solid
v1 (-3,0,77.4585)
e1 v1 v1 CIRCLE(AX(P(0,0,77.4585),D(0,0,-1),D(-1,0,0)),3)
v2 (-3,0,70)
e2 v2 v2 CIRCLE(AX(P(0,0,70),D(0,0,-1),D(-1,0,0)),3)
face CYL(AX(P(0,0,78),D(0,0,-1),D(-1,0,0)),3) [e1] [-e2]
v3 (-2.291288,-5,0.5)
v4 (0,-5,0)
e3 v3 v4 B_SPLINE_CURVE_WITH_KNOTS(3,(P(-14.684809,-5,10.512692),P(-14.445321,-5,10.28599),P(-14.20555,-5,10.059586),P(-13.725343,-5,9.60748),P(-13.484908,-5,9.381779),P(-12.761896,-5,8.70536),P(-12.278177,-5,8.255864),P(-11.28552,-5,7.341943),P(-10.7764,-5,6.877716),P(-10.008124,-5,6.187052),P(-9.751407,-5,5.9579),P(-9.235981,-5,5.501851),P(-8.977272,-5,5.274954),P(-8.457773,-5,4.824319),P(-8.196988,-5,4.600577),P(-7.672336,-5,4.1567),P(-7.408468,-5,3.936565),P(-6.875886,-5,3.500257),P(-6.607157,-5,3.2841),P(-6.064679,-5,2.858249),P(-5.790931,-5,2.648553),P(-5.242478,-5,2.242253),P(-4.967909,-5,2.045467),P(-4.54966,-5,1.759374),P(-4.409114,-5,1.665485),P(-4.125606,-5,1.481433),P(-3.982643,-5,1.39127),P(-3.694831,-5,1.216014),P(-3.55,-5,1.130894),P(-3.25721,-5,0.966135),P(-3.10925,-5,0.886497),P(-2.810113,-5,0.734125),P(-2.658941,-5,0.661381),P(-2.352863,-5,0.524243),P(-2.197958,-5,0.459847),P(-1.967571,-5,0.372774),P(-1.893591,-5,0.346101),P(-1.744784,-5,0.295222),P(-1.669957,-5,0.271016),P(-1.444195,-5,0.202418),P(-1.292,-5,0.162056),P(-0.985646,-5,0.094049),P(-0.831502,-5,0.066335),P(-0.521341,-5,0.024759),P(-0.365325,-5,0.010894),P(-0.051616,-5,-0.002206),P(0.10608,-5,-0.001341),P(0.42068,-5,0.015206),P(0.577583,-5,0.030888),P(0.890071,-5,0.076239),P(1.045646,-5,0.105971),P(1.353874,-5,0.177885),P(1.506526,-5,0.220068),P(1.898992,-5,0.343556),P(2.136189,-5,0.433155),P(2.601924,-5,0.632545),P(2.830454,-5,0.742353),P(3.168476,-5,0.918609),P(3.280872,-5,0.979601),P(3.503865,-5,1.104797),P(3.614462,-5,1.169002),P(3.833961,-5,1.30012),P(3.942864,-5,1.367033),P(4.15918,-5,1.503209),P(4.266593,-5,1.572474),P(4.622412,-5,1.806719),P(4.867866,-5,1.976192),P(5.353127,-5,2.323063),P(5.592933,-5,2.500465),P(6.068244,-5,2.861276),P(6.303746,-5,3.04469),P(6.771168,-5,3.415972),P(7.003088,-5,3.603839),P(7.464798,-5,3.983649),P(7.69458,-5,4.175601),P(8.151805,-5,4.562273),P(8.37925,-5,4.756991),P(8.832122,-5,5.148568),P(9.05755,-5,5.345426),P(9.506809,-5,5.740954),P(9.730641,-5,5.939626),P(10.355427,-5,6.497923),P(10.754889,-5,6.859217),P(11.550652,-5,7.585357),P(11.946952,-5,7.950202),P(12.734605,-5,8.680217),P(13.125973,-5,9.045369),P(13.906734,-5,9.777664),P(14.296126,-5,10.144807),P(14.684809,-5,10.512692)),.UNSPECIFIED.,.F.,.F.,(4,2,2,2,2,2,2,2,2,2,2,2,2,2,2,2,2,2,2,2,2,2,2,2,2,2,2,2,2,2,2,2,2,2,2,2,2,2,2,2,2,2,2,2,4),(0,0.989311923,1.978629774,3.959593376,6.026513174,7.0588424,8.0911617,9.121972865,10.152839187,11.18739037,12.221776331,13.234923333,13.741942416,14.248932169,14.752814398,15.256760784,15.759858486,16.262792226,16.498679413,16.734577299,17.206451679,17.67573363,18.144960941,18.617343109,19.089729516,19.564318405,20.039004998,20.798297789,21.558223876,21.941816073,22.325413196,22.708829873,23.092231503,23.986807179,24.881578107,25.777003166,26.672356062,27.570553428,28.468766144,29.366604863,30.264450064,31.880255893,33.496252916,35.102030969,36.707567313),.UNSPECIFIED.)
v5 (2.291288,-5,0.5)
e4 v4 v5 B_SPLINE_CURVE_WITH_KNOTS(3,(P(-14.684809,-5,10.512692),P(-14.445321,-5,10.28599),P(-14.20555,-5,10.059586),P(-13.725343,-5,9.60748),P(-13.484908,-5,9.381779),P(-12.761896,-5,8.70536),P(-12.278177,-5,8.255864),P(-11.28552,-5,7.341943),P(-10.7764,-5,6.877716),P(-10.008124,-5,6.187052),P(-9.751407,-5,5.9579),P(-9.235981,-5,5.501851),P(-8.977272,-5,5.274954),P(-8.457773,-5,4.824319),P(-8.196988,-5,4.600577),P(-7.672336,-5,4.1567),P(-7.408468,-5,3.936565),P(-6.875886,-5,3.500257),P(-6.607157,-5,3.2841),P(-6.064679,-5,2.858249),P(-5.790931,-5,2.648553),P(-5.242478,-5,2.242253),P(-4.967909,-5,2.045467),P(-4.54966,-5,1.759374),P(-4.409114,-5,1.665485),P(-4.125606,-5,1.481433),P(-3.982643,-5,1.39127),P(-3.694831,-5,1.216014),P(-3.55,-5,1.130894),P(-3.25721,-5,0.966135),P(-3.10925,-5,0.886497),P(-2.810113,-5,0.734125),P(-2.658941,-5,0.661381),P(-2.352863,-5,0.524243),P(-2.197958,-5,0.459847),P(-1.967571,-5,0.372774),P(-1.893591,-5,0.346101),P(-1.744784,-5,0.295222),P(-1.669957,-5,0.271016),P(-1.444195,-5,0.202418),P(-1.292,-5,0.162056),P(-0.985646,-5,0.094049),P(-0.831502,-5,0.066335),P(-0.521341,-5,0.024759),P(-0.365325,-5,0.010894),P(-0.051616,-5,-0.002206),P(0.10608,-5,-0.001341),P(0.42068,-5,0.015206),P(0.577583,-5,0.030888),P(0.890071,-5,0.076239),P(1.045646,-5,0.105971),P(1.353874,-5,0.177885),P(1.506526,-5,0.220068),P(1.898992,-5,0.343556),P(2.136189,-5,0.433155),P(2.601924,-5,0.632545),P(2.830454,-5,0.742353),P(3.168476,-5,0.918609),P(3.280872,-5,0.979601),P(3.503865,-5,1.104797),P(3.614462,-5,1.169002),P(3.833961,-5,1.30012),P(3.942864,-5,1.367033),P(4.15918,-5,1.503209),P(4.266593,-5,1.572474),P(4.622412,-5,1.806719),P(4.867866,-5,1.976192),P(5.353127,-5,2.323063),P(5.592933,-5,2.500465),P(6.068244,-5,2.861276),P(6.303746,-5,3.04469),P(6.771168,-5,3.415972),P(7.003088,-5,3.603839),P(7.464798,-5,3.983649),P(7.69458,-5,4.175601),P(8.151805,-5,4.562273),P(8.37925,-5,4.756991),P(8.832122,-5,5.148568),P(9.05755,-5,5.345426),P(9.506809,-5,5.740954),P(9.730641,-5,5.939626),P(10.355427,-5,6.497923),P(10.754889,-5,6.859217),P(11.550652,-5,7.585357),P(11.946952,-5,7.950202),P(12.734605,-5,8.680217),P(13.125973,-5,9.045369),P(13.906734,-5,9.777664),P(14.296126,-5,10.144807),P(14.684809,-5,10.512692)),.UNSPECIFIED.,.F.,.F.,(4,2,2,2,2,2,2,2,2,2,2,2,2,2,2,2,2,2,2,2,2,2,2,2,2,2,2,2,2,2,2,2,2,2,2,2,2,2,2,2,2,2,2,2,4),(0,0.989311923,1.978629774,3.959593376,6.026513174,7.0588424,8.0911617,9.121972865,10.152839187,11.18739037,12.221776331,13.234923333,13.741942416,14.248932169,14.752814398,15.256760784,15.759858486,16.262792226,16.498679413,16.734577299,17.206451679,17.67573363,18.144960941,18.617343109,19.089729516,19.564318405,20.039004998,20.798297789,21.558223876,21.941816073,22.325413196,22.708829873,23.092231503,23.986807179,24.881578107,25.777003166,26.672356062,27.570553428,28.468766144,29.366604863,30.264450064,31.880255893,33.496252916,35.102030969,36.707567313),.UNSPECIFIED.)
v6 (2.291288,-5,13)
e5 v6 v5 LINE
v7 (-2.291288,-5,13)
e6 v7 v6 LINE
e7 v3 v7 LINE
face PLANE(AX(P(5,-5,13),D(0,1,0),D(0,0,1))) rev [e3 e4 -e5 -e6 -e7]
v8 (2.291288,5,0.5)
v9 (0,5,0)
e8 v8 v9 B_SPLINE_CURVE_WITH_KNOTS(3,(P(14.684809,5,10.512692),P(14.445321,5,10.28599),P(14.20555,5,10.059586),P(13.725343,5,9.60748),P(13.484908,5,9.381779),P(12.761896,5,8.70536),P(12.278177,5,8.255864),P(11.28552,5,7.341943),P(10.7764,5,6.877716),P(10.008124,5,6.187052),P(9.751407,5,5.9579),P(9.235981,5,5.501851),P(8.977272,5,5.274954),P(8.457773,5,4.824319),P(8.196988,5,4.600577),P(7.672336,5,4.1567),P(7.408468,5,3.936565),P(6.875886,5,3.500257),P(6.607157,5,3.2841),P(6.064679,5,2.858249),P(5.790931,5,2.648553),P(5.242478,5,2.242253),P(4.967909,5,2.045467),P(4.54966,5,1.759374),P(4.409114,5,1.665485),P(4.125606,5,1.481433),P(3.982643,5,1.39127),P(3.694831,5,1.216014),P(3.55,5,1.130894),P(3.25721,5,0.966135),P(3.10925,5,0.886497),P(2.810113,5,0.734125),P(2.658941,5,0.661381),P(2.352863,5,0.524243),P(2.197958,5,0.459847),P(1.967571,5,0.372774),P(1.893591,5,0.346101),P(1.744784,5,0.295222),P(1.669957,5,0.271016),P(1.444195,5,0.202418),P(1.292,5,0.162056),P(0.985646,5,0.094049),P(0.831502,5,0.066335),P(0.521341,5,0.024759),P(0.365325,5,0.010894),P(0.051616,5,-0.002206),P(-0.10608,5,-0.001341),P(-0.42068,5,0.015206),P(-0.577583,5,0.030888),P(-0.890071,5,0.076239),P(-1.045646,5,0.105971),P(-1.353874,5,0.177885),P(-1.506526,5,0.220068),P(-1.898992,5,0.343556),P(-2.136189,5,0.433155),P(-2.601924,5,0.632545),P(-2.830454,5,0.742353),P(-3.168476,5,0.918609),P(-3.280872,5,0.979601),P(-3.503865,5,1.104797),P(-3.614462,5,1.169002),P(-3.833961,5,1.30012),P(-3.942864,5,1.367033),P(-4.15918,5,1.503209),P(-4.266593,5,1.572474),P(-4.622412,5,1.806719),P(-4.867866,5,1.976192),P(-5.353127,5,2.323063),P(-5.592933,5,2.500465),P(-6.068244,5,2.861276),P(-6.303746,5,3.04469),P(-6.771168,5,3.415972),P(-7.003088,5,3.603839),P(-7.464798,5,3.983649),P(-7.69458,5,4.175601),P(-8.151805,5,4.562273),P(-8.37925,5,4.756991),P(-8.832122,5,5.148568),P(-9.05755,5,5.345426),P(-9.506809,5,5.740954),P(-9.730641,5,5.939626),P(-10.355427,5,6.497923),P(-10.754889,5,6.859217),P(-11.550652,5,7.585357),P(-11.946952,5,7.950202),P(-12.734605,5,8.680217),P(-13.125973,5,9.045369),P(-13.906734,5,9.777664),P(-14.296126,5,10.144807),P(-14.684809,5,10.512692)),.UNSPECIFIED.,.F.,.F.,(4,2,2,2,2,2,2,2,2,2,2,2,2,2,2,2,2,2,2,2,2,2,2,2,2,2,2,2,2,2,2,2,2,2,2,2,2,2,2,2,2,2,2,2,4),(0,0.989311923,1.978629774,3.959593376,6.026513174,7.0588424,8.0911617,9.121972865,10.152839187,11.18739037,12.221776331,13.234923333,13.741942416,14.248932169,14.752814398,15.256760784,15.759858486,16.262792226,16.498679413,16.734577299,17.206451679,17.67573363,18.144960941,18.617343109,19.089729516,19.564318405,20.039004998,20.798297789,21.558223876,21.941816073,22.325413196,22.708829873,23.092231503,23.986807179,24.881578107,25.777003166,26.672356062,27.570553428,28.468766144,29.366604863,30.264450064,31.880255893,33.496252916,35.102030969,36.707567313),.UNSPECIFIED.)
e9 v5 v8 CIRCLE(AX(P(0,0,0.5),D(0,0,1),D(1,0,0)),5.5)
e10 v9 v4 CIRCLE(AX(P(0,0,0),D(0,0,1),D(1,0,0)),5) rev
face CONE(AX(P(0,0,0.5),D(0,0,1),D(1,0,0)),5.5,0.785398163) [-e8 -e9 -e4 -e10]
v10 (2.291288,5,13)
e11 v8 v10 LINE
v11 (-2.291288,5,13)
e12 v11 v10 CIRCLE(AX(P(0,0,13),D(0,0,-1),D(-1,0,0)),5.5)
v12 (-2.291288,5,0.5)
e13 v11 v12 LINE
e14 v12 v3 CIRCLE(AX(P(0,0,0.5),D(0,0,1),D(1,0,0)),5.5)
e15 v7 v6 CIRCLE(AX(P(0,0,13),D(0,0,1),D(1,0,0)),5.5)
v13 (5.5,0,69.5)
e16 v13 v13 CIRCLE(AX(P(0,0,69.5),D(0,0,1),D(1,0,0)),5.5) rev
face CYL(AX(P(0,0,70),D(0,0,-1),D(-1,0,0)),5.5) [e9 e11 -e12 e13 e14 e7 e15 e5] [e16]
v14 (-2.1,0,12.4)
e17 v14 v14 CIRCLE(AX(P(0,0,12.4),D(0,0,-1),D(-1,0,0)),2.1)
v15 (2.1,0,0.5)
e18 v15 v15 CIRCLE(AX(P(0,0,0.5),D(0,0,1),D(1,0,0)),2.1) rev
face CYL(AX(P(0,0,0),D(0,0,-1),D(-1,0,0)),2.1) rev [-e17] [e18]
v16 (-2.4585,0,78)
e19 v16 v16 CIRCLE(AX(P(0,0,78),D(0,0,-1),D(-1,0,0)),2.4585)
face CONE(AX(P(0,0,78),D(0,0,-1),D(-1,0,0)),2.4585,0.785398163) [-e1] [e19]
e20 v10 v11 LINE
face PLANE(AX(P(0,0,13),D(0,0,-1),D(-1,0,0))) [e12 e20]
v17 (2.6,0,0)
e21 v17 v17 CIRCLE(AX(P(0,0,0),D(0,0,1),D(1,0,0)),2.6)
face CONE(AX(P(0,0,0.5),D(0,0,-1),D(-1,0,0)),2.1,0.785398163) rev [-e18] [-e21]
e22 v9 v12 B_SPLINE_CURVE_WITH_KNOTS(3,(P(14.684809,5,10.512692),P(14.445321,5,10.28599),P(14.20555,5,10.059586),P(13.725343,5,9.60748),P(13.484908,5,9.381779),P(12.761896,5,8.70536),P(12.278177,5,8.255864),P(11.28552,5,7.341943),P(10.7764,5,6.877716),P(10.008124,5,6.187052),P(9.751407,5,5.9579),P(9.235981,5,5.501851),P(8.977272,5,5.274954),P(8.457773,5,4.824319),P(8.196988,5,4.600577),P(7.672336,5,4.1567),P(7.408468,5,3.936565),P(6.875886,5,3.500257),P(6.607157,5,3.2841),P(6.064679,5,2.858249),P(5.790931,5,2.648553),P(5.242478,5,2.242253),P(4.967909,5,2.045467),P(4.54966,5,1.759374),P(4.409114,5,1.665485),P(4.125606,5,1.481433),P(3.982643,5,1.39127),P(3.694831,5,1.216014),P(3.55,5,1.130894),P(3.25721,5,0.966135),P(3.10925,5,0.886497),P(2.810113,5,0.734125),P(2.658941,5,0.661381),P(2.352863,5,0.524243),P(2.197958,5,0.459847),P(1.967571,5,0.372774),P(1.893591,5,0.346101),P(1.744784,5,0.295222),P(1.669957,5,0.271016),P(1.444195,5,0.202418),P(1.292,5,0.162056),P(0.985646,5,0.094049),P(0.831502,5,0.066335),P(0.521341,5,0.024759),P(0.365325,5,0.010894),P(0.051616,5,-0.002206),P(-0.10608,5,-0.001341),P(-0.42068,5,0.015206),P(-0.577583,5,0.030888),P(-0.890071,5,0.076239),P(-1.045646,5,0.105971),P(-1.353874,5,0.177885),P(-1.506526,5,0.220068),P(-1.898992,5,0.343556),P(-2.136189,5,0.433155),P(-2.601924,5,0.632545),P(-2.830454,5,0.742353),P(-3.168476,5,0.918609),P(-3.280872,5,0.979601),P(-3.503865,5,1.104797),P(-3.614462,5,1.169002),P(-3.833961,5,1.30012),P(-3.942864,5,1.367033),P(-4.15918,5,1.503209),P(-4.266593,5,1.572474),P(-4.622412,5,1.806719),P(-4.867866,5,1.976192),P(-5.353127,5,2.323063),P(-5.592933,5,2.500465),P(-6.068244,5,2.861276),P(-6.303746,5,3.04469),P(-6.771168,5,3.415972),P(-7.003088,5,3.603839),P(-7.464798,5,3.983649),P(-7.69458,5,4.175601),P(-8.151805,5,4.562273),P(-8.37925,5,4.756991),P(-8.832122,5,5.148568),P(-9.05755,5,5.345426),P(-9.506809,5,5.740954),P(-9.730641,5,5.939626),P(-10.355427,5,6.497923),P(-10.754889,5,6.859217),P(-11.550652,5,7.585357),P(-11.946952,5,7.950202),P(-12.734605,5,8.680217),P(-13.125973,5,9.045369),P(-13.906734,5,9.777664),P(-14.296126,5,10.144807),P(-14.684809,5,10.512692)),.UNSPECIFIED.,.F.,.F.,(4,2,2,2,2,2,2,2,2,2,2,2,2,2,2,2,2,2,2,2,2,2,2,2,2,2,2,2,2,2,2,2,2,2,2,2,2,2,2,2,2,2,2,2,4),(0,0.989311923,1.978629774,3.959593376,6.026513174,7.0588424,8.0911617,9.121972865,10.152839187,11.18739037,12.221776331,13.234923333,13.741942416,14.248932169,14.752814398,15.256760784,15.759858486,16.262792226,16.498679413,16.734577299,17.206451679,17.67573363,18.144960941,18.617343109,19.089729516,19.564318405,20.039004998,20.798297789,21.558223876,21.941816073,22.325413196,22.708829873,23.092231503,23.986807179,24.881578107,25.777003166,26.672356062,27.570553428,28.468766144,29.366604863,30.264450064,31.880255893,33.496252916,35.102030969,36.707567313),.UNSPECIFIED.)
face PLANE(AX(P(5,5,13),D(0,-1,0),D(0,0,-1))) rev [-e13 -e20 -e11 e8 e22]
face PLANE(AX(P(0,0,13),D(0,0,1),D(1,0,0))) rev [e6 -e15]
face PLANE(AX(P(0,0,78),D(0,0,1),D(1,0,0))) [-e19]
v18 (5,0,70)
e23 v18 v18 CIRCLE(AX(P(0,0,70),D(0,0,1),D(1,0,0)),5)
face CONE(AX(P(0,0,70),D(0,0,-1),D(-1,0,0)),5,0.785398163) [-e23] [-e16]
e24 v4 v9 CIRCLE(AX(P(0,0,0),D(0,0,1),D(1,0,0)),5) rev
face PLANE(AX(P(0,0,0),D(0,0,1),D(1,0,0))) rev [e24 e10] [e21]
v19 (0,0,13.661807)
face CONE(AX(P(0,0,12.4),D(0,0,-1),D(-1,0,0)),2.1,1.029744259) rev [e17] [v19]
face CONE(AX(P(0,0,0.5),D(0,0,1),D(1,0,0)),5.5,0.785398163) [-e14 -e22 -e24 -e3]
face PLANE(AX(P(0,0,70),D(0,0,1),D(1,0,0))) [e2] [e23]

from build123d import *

# Parameters (mm, degrees)
SKETCH_1_R             = 5.5
EXTRUDE_1_DEPTH        = 70
CHAMFER_1_SIZE         = 0.5
SKETCH_2_R             = 3.3
EXTRUDE_2_DEPTH        = 8
HOLE_WIZARD_M5_1_D     = 4.2
HOLE_WIZARD_M5_1_DEPTH = 12.4
HOLE_WIZARD_M5_1_TIP   = 1.2618073
CHAMFER_3_SIZE         = 0.5
SKETCH_6_W             = 10
SKETCH_6_H             = 3
CUT_EXTRUDE_1_DEPTH    = 13


# Read off the part's stored shape, not the designer's step: M6 机械螺纹 螺柱1
with BuildPart() as part:
    # 草图1 → 拉伸1 (new body)
    with BuildSketch(Plane.XY):
        Circle(SKETCH_1_R)
    extrude(amount=EXTRUDE_1_DEPTH)

    # 倒角1
    chamfer_1_edges = [part.edges().sort_by_distance(p)[0] for p in [
        (-5.5, 0, 0),
        (-5.5, 0, 70),
    ]]
    chamfer(chamfer_1_edges, length=CHAMFER_1_SIZE)

    # 草图2 → 拉伸2 (add)
    with BuildSketch(Plane.XY.offset(70)):
        Circle(SKETCH_2_R)
    extrude(amount=EXTRUDE_2_DEPTH)

    # M5 螺纹孔1
    with Locations(Plane(origin=(0, 0, 0), x_dir=(-1, 0, 0), z_dir=(0, 0, -1))):
        with Locations((0, 0)):
            Hole(HOLE_WIZARD_M5_1_D / 2, depth=HOLE_WIZARD_M5_1_DEPTH)
            with Locations((0, 0, -(HOLE_WIZARD_M5_1_DEPTH + HOLE_WIZARD_M5_1_TIP / 2))):  # 118° drill point
                Cone(0, HOLE_WIZARD_M5_1_D / 2, HOLE_WIZARD_M5_1_TIP, mode=Mode.SUBTRACT)

    # 倒角3
    chamfer_3_edges = [part.edges().sort_by_distance(p)[0] for p in [
        (-2.1, 0, 0),
    ]]
    chamfer(chamfer_3_edges, length=CHAMFER_3_SIZE)

    # 草图6 → 切除-拉伸1 (cut)
    with BuildSketch(Plane(origin=(0, 0, 0), x_dir=(-1, 0, 0), z_dir=(0, 0, -1))):
        with Locations((0, 6.5)):
            Rectangle(SKETCH_6_W, SKETCH_6_H)
        with Locations((0, -6.5)):
            Rectangle(SKETCH_6_W, SKETCH_6_H)
    extrude(amount=-CUT_EXTRUDE_1_DEPTH, mode=Mode.SUBTRACT)

    # M6 机械螺纹 螺柱1 outline → M6 机械螺纹 螺柱1 (revolve, cut)
    with BuildSketch(Plane.XZ):
        Polygon((3.3, 78), (2.4585, 78), (3, 77.4585), (3, 70), (3.3, 70), align=None)
    revolve(axis=Axis((0, 0, 0), (0, 0, 1)), mode=Mode.SUBTRACT)


solid = part.part
